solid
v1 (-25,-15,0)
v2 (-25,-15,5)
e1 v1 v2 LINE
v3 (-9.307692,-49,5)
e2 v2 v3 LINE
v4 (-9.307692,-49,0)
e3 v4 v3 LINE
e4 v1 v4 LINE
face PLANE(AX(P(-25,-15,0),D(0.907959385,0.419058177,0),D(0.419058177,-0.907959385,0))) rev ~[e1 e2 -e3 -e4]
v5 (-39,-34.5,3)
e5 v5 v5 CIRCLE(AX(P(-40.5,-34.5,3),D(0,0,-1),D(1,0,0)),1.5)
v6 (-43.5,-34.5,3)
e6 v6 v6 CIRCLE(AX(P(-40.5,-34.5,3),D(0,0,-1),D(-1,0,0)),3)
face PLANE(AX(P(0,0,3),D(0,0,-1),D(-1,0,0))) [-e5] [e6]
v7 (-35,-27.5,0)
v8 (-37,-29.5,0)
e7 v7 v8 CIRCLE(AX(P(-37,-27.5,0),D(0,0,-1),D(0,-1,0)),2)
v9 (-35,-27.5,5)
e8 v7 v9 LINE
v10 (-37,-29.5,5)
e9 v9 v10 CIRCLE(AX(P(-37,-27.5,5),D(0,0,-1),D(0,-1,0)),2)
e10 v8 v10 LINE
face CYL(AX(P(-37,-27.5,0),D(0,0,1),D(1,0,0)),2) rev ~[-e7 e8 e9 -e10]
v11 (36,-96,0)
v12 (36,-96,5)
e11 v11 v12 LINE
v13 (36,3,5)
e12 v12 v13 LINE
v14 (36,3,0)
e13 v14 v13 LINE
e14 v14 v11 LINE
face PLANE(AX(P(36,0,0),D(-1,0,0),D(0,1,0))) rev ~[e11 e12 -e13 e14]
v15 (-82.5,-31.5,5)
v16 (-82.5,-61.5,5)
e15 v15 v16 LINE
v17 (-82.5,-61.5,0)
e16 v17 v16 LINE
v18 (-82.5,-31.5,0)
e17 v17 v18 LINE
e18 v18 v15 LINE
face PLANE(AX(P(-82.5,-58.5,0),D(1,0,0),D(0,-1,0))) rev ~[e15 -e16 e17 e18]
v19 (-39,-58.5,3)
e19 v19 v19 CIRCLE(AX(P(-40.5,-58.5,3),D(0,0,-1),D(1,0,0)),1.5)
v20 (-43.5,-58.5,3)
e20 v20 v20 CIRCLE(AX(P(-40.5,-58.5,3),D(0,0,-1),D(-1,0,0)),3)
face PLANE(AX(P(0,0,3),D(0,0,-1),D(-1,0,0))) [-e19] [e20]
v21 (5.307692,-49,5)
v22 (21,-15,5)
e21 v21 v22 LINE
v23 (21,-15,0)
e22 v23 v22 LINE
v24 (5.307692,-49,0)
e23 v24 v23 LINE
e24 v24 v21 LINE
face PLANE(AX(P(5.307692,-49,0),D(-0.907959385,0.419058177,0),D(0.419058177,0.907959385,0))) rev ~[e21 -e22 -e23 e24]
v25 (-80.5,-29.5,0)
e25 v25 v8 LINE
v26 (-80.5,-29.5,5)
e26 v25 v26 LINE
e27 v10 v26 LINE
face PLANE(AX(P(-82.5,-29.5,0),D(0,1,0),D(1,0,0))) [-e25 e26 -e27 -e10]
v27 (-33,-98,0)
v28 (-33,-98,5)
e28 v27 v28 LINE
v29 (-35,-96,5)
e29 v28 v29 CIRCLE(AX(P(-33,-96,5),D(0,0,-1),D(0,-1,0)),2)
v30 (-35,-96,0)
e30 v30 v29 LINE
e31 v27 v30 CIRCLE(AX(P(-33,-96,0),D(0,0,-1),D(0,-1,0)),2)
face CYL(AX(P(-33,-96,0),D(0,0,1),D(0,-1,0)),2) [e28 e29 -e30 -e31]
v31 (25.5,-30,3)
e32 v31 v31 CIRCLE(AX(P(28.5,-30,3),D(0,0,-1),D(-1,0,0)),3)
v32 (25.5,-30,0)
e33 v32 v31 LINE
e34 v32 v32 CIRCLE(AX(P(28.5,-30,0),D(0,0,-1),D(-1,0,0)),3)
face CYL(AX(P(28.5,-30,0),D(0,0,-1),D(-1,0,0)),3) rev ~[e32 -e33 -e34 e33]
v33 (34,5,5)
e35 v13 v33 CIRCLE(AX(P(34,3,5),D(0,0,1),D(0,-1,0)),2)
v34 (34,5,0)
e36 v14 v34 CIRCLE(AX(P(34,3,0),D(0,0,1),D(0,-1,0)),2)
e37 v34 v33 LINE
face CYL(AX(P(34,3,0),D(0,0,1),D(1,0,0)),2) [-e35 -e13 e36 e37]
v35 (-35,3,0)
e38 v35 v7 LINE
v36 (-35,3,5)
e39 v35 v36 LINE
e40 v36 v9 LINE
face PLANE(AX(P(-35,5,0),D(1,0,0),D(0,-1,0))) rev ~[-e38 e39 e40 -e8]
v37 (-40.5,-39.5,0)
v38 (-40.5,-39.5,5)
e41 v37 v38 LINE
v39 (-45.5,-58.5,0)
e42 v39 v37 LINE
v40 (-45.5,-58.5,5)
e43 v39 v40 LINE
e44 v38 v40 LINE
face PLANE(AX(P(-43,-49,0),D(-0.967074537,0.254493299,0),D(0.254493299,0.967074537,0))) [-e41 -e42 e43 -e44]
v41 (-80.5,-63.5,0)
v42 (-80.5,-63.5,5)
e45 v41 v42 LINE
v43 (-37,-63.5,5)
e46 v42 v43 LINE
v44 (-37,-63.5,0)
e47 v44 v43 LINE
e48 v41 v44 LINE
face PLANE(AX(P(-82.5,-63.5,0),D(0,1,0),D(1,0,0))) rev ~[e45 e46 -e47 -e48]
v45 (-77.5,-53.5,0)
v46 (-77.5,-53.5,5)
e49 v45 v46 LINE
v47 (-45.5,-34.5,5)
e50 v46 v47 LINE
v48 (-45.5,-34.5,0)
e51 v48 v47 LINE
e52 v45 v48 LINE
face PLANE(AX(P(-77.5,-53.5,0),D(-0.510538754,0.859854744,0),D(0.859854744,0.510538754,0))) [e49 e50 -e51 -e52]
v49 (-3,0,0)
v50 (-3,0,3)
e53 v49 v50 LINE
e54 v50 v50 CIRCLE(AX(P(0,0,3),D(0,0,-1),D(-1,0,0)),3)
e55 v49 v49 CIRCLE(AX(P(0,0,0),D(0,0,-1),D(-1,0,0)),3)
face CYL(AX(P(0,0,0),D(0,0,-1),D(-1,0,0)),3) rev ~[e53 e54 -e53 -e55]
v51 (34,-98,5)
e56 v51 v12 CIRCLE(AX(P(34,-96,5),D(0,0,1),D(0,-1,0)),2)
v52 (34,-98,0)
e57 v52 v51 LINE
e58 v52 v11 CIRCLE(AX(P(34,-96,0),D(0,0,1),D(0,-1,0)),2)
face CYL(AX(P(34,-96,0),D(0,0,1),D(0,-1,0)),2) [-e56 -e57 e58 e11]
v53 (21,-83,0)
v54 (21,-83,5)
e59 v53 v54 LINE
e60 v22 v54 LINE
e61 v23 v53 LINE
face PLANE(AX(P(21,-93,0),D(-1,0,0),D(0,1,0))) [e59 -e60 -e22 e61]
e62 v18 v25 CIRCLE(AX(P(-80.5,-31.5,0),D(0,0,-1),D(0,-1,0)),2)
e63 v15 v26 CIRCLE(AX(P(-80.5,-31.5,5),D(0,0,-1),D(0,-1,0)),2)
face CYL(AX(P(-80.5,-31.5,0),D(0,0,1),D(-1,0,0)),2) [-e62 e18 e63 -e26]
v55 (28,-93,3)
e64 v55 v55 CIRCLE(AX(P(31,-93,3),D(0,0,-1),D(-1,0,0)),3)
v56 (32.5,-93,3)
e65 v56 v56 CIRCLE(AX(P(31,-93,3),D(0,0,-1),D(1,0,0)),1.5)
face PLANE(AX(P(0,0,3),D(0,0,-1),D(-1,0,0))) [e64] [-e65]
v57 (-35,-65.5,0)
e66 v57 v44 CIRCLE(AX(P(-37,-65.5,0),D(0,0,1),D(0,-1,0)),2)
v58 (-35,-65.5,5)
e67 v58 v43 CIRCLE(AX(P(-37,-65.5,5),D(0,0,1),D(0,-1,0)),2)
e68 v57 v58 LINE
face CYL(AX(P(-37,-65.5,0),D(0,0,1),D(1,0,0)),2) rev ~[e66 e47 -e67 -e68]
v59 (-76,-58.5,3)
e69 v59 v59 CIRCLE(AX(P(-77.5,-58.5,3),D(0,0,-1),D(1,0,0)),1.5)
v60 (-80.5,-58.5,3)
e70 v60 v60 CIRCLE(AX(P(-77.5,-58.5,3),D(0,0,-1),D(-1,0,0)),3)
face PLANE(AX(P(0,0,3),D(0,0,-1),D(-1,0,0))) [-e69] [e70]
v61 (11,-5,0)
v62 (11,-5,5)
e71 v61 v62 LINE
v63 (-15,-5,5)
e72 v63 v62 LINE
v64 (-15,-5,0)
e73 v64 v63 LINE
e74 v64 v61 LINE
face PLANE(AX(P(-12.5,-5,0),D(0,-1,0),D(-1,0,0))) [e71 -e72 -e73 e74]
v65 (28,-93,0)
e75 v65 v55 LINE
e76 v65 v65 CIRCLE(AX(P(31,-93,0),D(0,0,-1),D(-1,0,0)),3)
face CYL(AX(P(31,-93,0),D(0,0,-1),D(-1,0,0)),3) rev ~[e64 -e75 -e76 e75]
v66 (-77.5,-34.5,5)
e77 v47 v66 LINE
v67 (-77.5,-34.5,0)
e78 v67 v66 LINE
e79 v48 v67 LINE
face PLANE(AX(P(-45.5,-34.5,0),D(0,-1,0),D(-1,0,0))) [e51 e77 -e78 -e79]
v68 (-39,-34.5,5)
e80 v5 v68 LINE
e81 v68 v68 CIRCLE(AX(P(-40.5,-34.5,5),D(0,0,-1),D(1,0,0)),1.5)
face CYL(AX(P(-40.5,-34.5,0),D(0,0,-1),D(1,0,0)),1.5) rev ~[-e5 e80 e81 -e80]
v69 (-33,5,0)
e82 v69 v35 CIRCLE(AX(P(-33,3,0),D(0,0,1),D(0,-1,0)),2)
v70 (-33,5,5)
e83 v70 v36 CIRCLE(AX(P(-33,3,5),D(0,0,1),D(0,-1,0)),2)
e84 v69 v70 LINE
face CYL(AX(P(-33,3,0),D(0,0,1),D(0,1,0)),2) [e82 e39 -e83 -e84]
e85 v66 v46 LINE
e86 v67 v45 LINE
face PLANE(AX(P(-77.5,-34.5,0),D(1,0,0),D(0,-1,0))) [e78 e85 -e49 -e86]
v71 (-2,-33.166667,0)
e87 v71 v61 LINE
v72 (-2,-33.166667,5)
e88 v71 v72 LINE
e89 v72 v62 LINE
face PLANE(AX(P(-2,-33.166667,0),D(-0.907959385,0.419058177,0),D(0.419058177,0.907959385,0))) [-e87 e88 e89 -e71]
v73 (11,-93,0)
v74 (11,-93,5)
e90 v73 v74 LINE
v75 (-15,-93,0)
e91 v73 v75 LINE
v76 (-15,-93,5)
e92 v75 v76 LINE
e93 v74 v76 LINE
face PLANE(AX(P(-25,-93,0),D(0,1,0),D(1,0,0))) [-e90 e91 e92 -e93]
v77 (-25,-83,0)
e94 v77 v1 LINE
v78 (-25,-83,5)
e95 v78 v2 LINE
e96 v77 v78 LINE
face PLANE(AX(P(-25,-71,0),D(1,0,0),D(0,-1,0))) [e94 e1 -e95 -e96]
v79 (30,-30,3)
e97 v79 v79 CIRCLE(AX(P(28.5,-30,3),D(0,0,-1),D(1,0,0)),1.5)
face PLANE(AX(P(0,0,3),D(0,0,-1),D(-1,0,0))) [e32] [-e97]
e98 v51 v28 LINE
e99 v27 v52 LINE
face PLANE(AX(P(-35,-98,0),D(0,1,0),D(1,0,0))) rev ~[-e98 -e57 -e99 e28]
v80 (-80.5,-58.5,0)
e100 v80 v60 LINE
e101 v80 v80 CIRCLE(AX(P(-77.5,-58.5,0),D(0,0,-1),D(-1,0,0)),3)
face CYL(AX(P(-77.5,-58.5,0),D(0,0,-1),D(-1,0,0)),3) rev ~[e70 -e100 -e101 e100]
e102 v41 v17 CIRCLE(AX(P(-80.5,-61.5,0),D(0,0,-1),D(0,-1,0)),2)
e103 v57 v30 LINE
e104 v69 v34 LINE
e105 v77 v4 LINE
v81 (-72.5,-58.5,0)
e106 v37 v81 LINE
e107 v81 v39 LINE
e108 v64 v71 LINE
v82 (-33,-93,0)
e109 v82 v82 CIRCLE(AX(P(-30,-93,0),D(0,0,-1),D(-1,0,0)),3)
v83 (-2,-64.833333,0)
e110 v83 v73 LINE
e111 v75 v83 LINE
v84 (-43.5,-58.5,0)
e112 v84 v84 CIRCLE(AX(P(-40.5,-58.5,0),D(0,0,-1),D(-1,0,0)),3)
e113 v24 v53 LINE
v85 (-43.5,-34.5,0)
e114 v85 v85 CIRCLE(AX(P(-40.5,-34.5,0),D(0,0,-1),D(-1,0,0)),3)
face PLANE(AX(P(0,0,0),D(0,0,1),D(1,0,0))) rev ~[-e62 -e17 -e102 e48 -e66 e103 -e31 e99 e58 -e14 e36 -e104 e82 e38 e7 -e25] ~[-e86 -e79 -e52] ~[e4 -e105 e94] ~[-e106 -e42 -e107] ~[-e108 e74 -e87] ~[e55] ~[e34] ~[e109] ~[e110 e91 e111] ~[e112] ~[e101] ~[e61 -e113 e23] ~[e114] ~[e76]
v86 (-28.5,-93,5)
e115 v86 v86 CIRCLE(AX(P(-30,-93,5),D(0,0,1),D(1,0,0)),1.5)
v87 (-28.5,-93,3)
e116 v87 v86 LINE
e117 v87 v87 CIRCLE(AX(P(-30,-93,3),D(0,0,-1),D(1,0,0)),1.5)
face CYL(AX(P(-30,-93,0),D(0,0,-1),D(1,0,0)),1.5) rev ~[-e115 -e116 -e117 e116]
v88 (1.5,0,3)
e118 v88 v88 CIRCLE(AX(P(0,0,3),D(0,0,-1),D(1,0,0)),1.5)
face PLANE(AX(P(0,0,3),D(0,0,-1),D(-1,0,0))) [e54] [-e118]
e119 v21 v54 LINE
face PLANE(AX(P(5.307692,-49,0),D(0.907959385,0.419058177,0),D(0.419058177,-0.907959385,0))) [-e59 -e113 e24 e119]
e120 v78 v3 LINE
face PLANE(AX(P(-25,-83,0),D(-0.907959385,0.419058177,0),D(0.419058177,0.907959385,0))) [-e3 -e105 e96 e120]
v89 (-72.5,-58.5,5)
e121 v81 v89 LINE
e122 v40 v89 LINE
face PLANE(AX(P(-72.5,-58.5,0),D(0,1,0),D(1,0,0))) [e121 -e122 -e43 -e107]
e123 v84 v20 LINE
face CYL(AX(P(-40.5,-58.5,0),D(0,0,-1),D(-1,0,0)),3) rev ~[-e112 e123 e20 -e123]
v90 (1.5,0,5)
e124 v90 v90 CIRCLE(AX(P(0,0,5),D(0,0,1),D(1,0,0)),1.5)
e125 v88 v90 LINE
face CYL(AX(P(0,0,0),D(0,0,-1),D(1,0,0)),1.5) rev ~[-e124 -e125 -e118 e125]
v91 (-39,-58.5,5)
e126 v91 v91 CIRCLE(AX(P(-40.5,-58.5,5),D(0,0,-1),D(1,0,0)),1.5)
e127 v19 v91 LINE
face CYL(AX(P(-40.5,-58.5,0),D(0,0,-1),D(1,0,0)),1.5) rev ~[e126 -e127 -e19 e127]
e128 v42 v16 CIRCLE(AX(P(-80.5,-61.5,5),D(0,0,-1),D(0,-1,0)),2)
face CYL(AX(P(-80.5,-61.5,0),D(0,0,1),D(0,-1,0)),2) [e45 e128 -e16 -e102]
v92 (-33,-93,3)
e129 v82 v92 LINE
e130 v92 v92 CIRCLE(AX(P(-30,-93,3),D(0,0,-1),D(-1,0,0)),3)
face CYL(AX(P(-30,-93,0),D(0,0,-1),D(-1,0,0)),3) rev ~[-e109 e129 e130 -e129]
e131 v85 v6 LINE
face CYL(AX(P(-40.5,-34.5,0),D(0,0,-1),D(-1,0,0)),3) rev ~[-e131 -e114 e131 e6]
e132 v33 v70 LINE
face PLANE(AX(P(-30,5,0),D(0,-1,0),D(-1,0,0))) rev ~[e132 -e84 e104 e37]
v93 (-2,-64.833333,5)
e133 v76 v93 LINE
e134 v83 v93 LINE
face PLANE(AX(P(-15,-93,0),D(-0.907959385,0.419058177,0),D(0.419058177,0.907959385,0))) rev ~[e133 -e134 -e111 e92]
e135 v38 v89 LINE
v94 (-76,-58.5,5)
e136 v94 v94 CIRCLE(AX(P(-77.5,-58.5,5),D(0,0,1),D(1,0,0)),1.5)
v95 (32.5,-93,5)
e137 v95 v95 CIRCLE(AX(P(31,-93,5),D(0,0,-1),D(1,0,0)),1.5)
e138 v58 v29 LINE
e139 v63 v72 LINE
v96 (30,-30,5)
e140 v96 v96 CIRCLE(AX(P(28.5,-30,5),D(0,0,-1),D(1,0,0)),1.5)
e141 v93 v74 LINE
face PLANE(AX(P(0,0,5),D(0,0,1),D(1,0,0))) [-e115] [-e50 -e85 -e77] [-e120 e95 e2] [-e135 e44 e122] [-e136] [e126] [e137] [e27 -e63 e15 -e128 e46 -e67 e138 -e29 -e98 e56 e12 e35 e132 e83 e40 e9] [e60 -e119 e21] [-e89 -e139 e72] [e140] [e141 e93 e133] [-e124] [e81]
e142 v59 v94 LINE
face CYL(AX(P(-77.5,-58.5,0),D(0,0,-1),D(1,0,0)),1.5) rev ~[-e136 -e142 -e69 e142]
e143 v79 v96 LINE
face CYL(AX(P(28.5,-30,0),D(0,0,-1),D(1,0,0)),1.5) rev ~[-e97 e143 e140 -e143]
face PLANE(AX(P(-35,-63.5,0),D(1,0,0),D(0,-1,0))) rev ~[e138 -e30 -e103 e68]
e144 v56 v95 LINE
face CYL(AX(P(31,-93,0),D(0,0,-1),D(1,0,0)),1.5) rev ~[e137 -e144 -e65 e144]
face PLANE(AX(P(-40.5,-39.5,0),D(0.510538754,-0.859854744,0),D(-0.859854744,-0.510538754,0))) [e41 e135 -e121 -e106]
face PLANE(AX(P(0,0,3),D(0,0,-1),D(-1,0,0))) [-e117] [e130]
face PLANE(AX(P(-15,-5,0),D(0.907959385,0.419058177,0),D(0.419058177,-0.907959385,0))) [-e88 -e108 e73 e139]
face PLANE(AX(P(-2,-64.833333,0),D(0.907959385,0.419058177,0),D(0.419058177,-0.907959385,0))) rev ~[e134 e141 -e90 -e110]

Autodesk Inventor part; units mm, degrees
ref_plane "YZ Plane" through (0, 0, 0) normal (1, 0, 0) x (0, 1, 0)
ref_plane "XZ Plane" through (0, 0, 0) normal (0, 1, 0) x (-1, 0, 0)
ref_plane "XY Plane" through (0, 0, 0) normal (0, 0, 1) x (1, 0, 0)
sketch "Boceto1" plane through (0, 0, 0) normal (0, 0, 1) x (1, 0, 0)
  circle A0 centre (0, 0) radius 1.5
  line L0 (0, 0) -> (28.5, 0)
  line L1 (28.5, 0) -> (28.5, -30)
  circle A1 centre (28.5, -30) radius 1.5
  line L2 (28.5, -30) -> (28.5, -93)
  line L3 (28.5, -93) -> (31, -93)
  circle A2 centre (31, -93) radius 1.5
  line L4 (31, -93) -> (-30, -93)
  circle A3 centre (-30, -93) radius 1.5
  line L5 (-30, -98) -> (31, -98)
  line L6 (31, -98) -> (36, -98)
  line L7 (36, -98) -> (36, 0)
  line L8 (36, 0) -> (36, 5)
  line L9 (36, 5) -> (-30, 5)
  line L10 (-30, 5) -> (-35, 5)
  line L11 (-35, 5) -> (-35, -98)
  line L12 (-35, -98) -> (-30, -98)
  line L13 (-40.5, -46.5) -> (-40.5, -34.5)
  line L14 (-40.5, -46.5) -> (-40.5, -58.5)
  circle A4 centre (-40.5, -34.5) radius 1.5
  circle A5 centre (-40.5, -58.5) radius 1.5
  line L15 (-40.5, -58.5) -> (-77.5, -58.5)
  circle A6 centre (-77.5, -58.5) radius 1.5
  line L16 (-82.5, -58.5) -> (-82.5, -63.5)
  line L17 (-82.5, -63.5) -> (-35, -63.5)
  line L18 (-82.5, -58.5) -> (-82.5, -34.5)
  line L19 (-82.5, -34.5) -> (-82.5, -29.5)
  line L20 (-82.5, -29.5) -> (-38, -29.5)
  line L21 (-38, -29.5) -> (-35, -29.5)
  line L22 (-60.25, -58.5) -> (-77.5, -58.5)
  dimension "d0" = 3
  dimension "d1" = 28.5
  dimension "d2" = 30
  dimension "d3" = 3
  dimension "d4" = 63
  dimension "d5" = 2.5
  dimension "d6" = 3
  dimension "d7" = 61
  dimension "d8" = 3
  dimension "d9" = 5
  dimension "d10" = 5
  dimension "d11" = 5
  dimension "d12" = 5
  dimension "d15" = 12
  dimension "d16" = 12
  dimension "d17" = 3
  dimension "d18" = 3
  dimension "d19" = 37
  dimension "d20" = 3
  dimension "d21" = 5
  dimension "d22" = 5
  dimension "d23" = 5
extrude "Extrusión1" add sketch "Boceto1" along normal blind 5
sketch "Boceto2" plane through (0, 0, 0) normal (0, 0, -1) x (-1, 0, 0)
  circle A0 centre (0, 0) radius 1.5 projected
  circle A1 centre (0, 0) radius 3
  circle A2 centre (-28.5, -30) radius 1.5 projected
  circle A3 centre (-28.5, -30) radius 3
  circle A4 centre (-31, -93) radius 1.5 projected
  circle A5 centre (-31, -93) radius 3
  circle A6 centre (30, -93) radius 1.5 projected
  circle A7 centre (30, -93) radius 3
  circle A8 centre (40.5, -58.5) radius 1.5 projected
  circle A9 centre (40.5, -58.5) radius 3
  circle A10 centre (77.5, -58.5) radius 1.5 projected
  circle A11 centre (77.5, -58.5) radius 3
  circle A12 centre (40.5, -34.5) radius 1.5 projected
  circle A13 centre (40.5, -34.5) radius 3
  dimension "d28" = 6
  dimension "d29" = 6
  dimension "d30" = 6
  dimension "d31" = 6
  dimension "d32" = 6
  dimension "d33" = 6
extrude "Extrusión2" cut sketch "Boceto2" against normal blind 3
sketch "Boceto3" plane through (0, 0, 0) normal (0, 0, -1) x (-1, 0, 0)
  circle A0 centre (-28.5, -30) radius 1.5 projected
  line L0 (-28.5, -30) -> (-21, -30)
  circle A1 centre (0, 0) radius 1.5 projected
  line L1 (0, 0) -> (0, -5)
  circle A2 centre (30, -93) radius 1.5 projected
  line L2 (30, -93) -> (25, -93)
  circle A3 centre (-31, -93) radius 1.5 projected
  line L3 (-31, -93) -> (-24.75, -93)
  line L4 (-24.75, -93) -> (-21, -93)
  circle A4 centre (40.5, -34.5) radius 1.5 projected
  line L5 (40.5, -34.5) -> (40.5, -39.5)
  line L6 (40.5, -34.5) -> (45.5, -34.5)
  circle A5 centre (40.5, -58.5) radius 3 projected
  line L7 (40.5, -58.5) -> (45.5, -58.5)
  circle A6 centre (77.5, -58.5) radius 1.5 projected
  line L8 (77.5, -58.5) -> (77.5, -53.5)
  line L9 (77.5, -53.5) -> (45.5, -34.5)
  line L10 (45.5, -34.5) -> (77.5, -34.5)
  line L11 (77.5, -34.5) -> (77.5, -53.5)
  line L12 (77.5, -58.5) -> (72.5, -58.5)
  line L13 (72.5, -58.5) -> (45.5, -58.5)
  line L14 (40.5, -39.5) -> (72.5, -58.5)
  line L15 (45.5, -58.5) -> (40.5, -39.5)
  line L16 (45.5, -58.5) -> (72.5, -58.5)
  line L17 (59, -58.5) -> (43, -49)
  line L18 (25, -49) -> (2, -5)
  line L19 (-21, -5) -> (-9.5, -27)
  line L20 (13.5, -49) -> (2, -27)
  line L21 (-10.5, -5) -> (2, -27)
  line L22 (-9.5, -49) -> (-21, -27)
  line L23 (25, -27) -> (12.5, -5)
  line L24 (12.5, -5) -> (25, -5)
  line L25 (25, -27) -> (25, -5)
  line L26 (13.5, -49) -> (25, -49)
  line L27 (-21, -27) -> (-9.5, -49)
  line L28 (-21, -27) -> (-21, -5)
  line L29 (-21, -93) -> (-21, -71)
  line L30 (13.5, -93) -> (-9.5, -49)
  line L31 (25, -71) -> (13.5, -49)
  line L32 (-21, -71.6828) -> (-21, -93)
  line L33 (-21, -71.6828) -> (-9.5, -93)
  line L34 (-9.5, -93) -> (-21, -93)
  line L35 (-21, -49) -> (-9.5, -49)
  line L36 (-9.5, -49) -> (13.5, -93)
  line L37 (13.5, -93) -> (2, -93)
  line L38 (25, -71) -> (25, -93)
  line L39 (2, -49) -> (25, -93)
  line L40 (-9.5, -27) -> (2, -49)
  line L41 (2, -49) -> (-9.5, -49)
  line L42 (-21, -27) -> (-21, -5)
  line L43 (-21, -49) -> (-9.5, -49)
  line L44 (-21, -49) -> (2, -93)
  line L45 (2, -93) -> (13.5, -93)
  line L46 (-9.5, -49) -> (13.5, -93)
  line L47 (2, -5) -> (0, -5)
  line L48 (-10.5, -5) -> (0, -5)
  line L49 (2, -49) -> (13.5, -49)
  line L50 (12.5, -5) -> (25, -27)
  line L51 (25, -27) -> (25, -5)
  line L52 (25, -5) -> (12.5, -5)
  line L53 (-21, -27) -> (-21, -5)
  line L54 (-21, -27) -> (-21, -5)
  line L55 (-21, -5) -> (2, -49)
  line L56 (2, -49) -> (-9.5, -49)
  line L57 (-9.5, -49) -> (-21, -27)
  dimension "d36" = 7.5
  dimension "d37" = 5
  dimension "d38" = 5
  dimension "d39" = 5
  dimension "d40" = 5
  dimension "d41" = 5
  dimension "d42" = 5
extrude "Extrusión3" cut sketch "Boceto3" against normal blind 5 contours L10 L11 L9 | L14 L13 L17 L15 | L17 L13 L15 | L26 L20 L21 L48 L47 L18 | L30 L37 L44 L35 | L41 L22 L28 L19 L40 | L31 L38 L39 L49 | L23 L24 L25 | L29 L33 L34
fillet "Empalme1" radius 2 6 edges at (36, -98, 2.5) (-35, -98, 2.5) (-82.5, -63.5, 2.5) (-82.5, -29.5, 2.5) (-35, 5, 2.5) (36, 5, 2.5)
fillet "Empalme2" radius 2 2 edges at (-35, -63.5, 2.5) (-35, -29.5, 2.5)
sketch "Boceto4" plane through (0, 0, 0) normal (0, 0, -1) x (-1, 0, 0)
  line L0 (2, -49) -> (-21, -5) projected
  line L1 (12.5, -5) -> (25, -5) projected
  line L2 (-21, -5) -> (25, -5)
  line L3 (25, -93) -> (2, -49) projected
  line L4 (25, -5) -> (25, -93)
  line L5 (25, -93) -> (-21, -93)
  line L6 (-21, -93) -> (-21, -5)
  point P0 (0, 0)
extrude "Extrusión4" cut sketch "Boceto4" against normal blind 5
sketch "Boceto5" plane through (0, 0, 0) normal (0, 0, -1) x (-1, 0, 0)
  line L0 (-21, -5) -> (-21, -15)
  line L1 (-21, -5) -> (-11, -5)
  line L2 (25, -93) -> (15, -93)
  line L3 (15, -93) -> (-21, -15)
  line L4 (25, -93) -> (25, -83)
  line L5 (25, -83) -> (-11, -5)
  line L6 (-21, -93) -> (-21, -83)
  line L7 (-21, -93) -> (-11, -93)
  line L8 (25, -5) -> (15, -5)
  line L9 (25, -5) -> (25, -15)
  line L10 (25, -15) -> (-11, -93)
  line L11 (15, -5) -> (-21, -83)
  point P0 (0, 0)
  dimension "d49" = 10
  dimension "d50" = 10
  dimension "d51" = 10
  dimension "d52" = 10
  dimension "d53" = 10
  dimension "d54" = 10
  dimension "d55" = 10
  dimension "d56" = 10
extrude "Extrusión5" add sketch "Boceto5" against normal blind 5
properties part number "soporte_nuc_up"
